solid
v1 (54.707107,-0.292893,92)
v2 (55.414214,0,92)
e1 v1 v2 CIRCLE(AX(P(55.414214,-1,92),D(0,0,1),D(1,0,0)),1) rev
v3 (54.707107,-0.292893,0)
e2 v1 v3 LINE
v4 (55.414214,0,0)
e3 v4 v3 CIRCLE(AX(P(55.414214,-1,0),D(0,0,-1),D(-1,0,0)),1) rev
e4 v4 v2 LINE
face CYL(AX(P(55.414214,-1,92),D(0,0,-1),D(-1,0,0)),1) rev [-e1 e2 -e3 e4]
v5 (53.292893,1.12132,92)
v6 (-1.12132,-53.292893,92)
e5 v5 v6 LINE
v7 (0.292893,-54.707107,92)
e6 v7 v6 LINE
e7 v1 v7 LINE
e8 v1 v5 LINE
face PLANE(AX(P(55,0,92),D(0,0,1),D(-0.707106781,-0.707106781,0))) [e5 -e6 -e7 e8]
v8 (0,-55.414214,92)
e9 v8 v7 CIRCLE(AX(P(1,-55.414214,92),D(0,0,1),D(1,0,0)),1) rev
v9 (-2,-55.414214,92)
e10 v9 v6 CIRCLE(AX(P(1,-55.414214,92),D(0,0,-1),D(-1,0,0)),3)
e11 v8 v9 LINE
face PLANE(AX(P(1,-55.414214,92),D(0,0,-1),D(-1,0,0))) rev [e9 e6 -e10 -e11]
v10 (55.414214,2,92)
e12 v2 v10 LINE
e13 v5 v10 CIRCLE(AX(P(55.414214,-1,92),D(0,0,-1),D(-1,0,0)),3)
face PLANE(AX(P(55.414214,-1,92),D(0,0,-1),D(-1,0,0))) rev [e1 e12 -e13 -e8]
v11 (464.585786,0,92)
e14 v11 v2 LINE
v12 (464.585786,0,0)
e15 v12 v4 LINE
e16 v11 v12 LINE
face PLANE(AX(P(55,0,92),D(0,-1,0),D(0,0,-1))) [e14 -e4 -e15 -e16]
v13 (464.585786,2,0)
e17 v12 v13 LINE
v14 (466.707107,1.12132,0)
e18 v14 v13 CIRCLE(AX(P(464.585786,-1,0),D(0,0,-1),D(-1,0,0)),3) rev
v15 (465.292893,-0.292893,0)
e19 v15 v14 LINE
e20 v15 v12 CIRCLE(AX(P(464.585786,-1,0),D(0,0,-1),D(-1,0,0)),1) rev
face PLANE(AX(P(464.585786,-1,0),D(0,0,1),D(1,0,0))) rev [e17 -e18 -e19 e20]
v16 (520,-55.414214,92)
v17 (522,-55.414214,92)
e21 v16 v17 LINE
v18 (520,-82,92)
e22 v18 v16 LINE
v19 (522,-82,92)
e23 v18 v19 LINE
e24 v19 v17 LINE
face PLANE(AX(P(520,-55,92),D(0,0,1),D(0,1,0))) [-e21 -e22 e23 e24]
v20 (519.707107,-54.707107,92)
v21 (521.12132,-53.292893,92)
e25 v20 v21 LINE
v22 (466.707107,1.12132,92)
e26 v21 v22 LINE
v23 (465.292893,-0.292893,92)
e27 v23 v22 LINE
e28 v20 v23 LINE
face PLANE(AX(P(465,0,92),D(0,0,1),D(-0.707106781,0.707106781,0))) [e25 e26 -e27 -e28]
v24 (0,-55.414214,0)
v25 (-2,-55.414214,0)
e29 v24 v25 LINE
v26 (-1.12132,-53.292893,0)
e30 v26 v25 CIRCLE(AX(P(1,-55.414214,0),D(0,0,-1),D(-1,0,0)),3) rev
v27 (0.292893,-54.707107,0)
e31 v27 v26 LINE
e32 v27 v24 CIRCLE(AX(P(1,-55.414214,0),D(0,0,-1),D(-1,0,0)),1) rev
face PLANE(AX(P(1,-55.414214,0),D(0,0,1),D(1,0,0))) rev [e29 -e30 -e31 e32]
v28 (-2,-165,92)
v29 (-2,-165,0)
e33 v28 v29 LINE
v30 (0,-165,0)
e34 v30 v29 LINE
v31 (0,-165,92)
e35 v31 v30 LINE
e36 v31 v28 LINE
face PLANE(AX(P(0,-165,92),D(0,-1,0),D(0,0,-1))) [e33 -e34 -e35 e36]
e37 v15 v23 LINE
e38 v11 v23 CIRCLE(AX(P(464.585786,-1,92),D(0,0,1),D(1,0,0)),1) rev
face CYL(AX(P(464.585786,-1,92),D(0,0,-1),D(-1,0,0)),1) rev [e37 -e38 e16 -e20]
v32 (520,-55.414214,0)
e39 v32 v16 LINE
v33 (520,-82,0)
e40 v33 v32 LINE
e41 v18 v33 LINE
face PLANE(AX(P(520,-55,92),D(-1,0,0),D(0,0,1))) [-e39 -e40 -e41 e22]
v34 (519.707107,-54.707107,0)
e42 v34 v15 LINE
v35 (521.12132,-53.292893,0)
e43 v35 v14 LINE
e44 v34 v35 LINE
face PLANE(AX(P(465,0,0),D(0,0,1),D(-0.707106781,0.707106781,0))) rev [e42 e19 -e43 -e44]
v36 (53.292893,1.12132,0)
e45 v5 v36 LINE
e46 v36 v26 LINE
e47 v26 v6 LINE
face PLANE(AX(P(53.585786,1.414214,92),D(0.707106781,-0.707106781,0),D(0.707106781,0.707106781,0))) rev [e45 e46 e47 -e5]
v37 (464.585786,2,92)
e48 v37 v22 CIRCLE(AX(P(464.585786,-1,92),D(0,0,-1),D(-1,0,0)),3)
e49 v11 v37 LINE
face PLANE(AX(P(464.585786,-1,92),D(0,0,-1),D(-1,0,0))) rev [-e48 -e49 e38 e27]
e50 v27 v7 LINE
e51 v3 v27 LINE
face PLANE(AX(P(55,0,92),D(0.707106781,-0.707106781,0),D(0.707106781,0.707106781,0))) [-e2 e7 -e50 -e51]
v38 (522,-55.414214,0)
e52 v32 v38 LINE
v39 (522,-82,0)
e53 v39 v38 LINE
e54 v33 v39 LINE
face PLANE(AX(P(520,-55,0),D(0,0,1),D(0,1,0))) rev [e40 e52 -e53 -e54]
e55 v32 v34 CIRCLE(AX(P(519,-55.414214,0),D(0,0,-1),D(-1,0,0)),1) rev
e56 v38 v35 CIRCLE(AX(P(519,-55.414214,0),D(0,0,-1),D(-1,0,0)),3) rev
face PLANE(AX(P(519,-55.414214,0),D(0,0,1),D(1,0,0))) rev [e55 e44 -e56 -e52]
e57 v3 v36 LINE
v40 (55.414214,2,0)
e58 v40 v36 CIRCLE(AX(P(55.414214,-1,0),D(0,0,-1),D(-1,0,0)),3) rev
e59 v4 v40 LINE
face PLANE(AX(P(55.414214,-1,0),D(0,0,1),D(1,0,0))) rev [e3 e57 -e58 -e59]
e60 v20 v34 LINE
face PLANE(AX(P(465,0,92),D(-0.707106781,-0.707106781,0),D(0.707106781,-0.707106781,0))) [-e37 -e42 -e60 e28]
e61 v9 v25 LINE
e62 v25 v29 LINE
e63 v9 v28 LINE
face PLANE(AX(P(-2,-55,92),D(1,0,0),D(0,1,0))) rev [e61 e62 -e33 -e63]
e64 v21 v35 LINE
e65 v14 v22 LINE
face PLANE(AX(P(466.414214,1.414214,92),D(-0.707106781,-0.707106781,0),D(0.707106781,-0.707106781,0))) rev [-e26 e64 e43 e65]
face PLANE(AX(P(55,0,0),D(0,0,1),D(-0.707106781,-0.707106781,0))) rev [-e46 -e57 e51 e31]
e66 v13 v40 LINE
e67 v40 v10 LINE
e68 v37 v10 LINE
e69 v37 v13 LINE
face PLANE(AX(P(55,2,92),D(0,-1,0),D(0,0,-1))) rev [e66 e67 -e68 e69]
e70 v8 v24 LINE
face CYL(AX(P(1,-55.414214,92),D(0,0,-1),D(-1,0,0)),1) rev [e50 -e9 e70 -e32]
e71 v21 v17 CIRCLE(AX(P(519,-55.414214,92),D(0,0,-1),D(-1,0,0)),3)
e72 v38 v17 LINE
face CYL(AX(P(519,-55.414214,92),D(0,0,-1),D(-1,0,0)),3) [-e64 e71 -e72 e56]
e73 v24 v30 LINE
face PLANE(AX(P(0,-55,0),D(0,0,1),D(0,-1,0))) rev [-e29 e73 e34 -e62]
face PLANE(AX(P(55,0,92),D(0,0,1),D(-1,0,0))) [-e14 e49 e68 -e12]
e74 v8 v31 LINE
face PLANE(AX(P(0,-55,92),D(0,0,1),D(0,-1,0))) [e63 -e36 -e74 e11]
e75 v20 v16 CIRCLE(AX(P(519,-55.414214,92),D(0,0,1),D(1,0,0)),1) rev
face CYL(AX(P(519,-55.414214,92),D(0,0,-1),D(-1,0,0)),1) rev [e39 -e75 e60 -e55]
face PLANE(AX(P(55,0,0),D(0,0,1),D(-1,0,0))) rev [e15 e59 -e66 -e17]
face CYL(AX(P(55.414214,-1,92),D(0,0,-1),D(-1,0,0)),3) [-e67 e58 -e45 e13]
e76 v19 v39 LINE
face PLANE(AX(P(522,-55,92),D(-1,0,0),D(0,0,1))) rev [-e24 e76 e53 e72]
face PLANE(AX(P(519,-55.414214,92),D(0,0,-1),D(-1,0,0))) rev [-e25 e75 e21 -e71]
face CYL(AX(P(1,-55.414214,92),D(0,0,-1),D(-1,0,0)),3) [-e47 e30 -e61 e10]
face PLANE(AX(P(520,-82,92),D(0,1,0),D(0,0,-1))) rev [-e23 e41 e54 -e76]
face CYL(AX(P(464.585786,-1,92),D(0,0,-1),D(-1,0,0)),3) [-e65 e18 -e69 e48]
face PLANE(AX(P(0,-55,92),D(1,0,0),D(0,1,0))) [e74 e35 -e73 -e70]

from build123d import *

# Parameters (mm, degrees)
EXTRU_MINCE1_DEPTH        = 92
CONVERTIR_VOLUME1_DEPTH   = 92
CONVERTIR_VOLUME1_2_DEPTH = 92


# Read off the part's stored shape, not the designer's step: Convertir-Volume1
with BuildPart() as part:
    # Esquisse1 → Extru.-Mince1 (new body)
    with BuildSketch(Plane.XY):
        Polygon((520, -82), (520, -55), (465, 0), (55, 0), (0, -55), (0, -165), (10, -165), (10, -59.142135624), (59.142135624, -10), (460.857864376, -10), (510, -59.142135624), (510, -82), align=None)
    extrude(amount=EXTRU_MINCE1_DEPTH)

    # Convertir-Volume1 outline → Convertir-Volume1 (cut)
    with BuildSketch(Plane.XY):
        with BuildLine():
            Line((0, -55.414213562), (0, -165))
            Line((0, -165), (10, -165))
            Line((10, -165), (10, -59.142135624))
            Line((10, -59.142135624), (59.142135624, -10))
            Line((59.142135624, -10), (460.857864376, -10))
            Line((460.857864376, -10), (510, -59.142135624))
            Line((510, -59.142135624), (510, -82))
            Line((510, -82), (520, -82))
            Line((520, -82), (520, -55.414213562))
            ThreePointArc((520, -55.414213562), (519.923879533, -55.03153013), (519.707106781, -54.707106781))
            Line((519.707106781, -54.707106781), (465.292893219, -0.292893219))
            ThreePointArc((465.292893219, -0.292893219), (464.96846987, -0.076120467), (464.585786438, 0))
            Line((464.585786438, 0), (55.414213562, 0))
            ThreePointArc((55.414213562, 0), (55.03153013, -0.076120467), (54.707106781, -0.292893219))
            Line((54.707106781, -0.292893219), (0.292893219, -54.707106781))
            ThreePointArc((0.292893219, -54.707106781), (0.076120467, -55.03153013), (0, -55.414213562))
        make_face()
    extrude(amount=CONVERTIR_VOLUME1_DEPTH, mode=Mode.SUBTRACT)

    # Convertir-Volume1 2 outline → Convertir-Volume1 2 (add)
    with BuildSketch(Plane.XY):
        with BuildLine():
            Line((-2, -55.414213562), (-2, -165))
            Line((-2, -165), (0, -165))
            Line((0, -165), (0, -55))
            Line((0, -55), (55, 0))
            Line((55, 0), (465, 0))
            Line((465, 0), (520, -55))
            Line((520, -55), (520, -82))
            Line((520, -82), (522, -82))
            Line((522, -82), (522, -55.414213562))
            ThreePointArc((522, -55.414213562), (521.771638598, -54.266163265), (521.121320344, -53.292893219))
            Line((521.121320344, -53.292893219), (466.707106781, 1.121320344))
            ThreePointArc((466.707106781, 1.121320344), (465.733836735, 1.771638598), (464.585786438, 2))
            Line((464.585786438, 2), (55.414213562, 2))
            ThreePointArc((55.414213562, 2), (54.266163265, 1.771638598), (53.292893219, 1.121320344))
            Line((53.292893219, 1.121320344), (-1.121320344, -53.292893219))
            ThreePointArc((-1.121320344, -53.292893219), (-1.771638598, -54.266163265), (-2, -55.414213562))
        make_face()
    extrude(amount=CONVERTIR_VOLUME1_2_DEPTH)


solid = part.part
